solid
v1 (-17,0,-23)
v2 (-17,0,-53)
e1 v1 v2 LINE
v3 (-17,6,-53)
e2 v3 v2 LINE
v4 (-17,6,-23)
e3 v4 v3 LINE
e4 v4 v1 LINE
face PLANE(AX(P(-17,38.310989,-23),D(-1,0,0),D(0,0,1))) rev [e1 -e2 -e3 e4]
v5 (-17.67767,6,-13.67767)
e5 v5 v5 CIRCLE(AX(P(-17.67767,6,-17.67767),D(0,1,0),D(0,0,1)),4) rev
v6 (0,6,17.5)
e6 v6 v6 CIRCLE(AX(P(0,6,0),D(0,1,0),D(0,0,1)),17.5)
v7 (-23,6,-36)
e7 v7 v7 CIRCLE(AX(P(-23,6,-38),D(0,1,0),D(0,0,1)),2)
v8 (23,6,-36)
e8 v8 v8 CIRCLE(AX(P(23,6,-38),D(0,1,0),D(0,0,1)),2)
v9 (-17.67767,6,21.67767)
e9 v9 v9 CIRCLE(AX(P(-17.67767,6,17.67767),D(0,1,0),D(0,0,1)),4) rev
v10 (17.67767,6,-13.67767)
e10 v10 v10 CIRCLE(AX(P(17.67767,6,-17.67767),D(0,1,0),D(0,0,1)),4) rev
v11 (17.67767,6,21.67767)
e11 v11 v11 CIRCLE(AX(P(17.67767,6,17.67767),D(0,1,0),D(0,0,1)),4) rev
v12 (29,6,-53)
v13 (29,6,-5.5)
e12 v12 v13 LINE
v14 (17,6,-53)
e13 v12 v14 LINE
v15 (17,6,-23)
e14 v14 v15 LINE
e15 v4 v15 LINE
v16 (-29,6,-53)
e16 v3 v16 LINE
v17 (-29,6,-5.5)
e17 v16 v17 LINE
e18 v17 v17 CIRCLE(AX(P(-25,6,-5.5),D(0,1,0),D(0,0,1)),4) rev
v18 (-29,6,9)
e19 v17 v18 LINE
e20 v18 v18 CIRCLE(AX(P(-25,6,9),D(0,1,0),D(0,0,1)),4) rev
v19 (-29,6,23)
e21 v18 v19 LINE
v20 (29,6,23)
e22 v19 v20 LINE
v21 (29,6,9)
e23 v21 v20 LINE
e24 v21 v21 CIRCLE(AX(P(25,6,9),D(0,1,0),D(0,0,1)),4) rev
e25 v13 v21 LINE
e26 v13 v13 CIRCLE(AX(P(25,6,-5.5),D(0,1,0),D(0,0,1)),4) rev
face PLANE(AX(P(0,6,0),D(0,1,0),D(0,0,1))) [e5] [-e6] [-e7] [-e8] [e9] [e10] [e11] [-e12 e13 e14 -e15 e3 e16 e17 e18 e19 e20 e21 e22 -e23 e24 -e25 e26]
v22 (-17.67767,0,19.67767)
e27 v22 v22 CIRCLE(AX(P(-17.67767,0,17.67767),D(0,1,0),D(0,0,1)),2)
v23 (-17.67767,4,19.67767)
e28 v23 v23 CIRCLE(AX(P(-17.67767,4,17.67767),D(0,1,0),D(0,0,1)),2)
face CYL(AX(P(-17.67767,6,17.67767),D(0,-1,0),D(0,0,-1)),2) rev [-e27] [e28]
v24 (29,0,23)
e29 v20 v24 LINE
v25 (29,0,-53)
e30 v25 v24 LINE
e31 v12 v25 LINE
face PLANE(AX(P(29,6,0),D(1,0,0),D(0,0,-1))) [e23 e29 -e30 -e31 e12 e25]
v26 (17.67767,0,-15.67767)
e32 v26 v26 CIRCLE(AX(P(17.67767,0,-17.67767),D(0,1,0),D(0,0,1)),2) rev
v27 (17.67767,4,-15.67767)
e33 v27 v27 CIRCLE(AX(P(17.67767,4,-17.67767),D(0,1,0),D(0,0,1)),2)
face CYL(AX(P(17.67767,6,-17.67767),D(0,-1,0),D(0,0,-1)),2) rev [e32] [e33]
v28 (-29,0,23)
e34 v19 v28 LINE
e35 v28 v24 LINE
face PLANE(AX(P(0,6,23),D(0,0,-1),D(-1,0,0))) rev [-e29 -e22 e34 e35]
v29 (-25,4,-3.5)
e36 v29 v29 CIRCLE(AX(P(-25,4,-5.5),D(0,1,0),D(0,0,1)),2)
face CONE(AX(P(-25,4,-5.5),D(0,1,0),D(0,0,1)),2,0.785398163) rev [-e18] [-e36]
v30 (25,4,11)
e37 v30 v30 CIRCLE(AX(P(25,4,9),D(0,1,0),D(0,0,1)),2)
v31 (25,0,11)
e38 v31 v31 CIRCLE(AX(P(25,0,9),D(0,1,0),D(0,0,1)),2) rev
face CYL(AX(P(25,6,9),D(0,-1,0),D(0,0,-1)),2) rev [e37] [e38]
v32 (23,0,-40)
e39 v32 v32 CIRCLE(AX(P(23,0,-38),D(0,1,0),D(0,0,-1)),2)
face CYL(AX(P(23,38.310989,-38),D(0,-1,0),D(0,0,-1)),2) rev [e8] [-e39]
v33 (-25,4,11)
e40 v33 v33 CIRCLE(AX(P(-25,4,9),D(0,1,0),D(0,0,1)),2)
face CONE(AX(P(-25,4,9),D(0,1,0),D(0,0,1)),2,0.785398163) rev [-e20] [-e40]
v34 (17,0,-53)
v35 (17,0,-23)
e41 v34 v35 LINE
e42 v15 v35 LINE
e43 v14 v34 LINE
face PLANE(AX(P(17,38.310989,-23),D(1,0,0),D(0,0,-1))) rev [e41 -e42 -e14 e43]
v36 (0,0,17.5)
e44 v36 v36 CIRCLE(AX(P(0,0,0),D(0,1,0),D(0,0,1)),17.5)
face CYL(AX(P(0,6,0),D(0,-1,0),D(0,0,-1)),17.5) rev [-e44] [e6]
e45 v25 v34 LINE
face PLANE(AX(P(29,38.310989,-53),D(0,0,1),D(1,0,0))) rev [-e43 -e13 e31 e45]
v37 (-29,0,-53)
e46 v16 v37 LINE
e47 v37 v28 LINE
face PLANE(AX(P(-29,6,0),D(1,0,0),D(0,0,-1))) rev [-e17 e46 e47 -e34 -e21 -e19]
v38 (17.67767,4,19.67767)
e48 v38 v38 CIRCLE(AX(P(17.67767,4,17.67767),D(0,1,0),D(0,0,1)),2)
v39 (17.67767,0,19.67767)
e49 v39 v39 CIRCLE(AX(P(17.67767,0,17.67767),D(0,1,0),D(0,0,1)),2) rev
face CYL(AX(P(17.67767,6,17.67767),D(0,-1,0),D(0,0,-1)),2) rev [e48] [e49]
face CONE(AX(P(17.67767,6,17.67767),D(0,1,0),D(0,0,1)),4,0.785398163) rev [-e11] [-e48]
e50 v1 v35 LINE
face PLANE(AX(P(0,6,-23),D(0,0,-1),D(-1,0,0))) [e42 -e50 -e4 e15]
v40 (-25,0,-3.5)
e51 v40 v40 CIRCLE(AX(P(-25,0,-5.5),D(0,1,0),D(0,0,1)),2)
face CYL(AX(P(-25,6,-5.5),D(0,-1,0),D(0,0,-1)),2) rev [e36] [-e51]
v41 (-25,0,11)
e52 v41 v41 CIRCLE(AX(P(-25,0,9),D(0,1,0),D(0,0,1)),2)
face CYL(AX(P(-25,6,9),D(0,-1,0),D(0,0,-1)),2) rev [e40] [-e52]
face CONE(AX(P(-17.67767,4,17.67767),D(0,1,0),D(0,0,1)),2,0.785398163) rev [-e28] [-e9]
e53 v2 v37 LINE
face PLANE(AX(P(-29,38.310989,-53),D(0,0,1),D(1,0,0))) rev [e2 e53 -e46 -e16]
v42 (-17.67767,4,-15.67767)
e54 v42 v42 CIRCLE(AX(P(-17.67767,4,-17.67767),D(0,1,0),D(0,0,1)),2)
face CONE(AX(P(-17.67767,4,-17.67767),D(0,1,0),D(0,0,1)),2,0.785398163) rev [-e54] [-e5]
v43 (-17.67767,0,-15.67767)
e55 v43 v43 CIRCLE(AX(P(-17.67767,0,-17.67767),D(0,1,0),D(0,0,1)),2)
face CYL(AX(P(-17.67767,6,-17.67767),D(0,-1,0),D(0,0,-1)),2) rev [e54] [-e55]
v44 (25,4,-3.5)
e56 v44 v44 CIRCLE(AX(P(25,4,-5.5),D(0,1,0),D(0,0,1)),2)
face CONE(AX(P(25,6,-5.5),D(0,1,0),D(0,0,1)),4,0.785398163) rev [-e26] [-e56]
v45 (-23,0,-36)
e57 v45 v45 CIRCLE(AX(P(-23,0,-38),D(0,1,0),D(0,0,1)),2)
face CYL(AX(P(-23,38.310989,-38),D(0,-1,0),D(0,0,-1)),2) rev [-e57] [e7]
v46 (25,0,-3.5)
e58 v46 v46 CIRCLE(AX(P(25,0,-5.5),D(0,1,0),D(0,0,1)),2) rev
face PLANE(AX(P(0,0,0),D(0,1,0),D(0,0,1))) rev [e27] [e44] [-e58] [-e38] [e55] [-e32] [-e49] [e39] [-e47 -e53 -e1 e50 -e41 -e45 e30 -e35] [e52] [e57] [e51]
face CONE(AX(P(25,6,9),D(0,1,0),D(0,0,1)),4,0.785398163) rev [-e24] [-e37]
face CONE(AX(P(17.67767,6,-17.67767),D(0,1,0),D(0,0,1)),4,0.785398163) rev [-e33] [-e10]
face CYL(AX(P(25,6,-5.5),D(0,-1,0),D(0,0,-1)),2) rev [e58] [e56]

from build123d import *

# Parameters (mm, degrees)
SKETCH_1_W      = 58
SKETCH_1_H      = 46
SKETCH_1_R      = 17.5
SKETCH_1_R_2    = 2
EXTRUDE_1_DEPTH = 6
SKETCH_2_W      = 12
SKETCH_2_H      = 30
SKETCH_2_R      = 2
EXTRUDE_2_DEPTH = 6
CHAMFER_1_SIZE  = 2


with BuildPart() as part:
    # 草图1 → 凸台-拉伸1 (new body)
    with BuildSketch(Plane(origin=(0, 0, 0), x_dir=(1, 0, 0), z_dir=(0, 1, 0))):
        Rectangle(SKETCH_1_W, SKETCH_1_H)
        with Locations(Location((0, 0, 0), (0, 0, 270))):
            Circle(SKETCH_1_R, mode=Mode.SUBTRACT)
        with Locations(Location((-17.67766953, 17.67766953, 0), (0, 0, 270))):
            Circle(SKETCH_1_R_2, mode=Mode.SUBTRACT)
        with Locations(Location((-17.67766953, -17.67766953, 0), (0, 0, 270))):
            Circle(SKETCH_1_R_2, mode=Mode.SUBTRACT)
        with Locations(Location((17.67766953, 17.67766953, 0), (0, 0, 270))):
            Circle(SKETCH_1_R_2, mode=Mode.SUBTRACT)
        with Locations(Location((17.67766953, -17.67766953, 0), (0, 0, 270))):
            Circle(SKETCH_1_R_2, mode=Mode.SUBTRACT)
        with Locations(Location((-25, 5.5, 0), (0, 0, 270))):
            Circle(SKETCH_1_R_2, mode=Mode.SUBTRACT)
        with Locations(Location((-25, -9, 0), (0, 0, 270))):
            Circle(SKETCH_1_R_2, mode=Mode.SUBTRACT)
        with Locations(Location((25, -9, 0), (0, 0, 270))):
            Circle(SKETCH_1_R_2, mode=Mode.SUBTRACT)
        with Locations(Location((25, 5.5, 0), (0, 0, 270))):
            Circle(SKETCH_1_R_2, mode=Mode.SUBTRACT)
    extrude(amount=EXTRUDE_1_DEPTH)

    # 草图2 → 凸台-拉伸2 (add)
    # profile 1 of 2: a face of its own
    with BuildSketch(Plane(origin=(0, 0, 0), x_dir=(1, 0, 0), z_dir=(0, 1, 0))):
        with Locations((-23, 38)):
            Rectangle(SKETCH_2_W, SKETCH_2_H)
        with Locations(Location((-23, 38, 0), (0, 0, 270))):
            Circle(SKETCH_2_R, mode=Mode.SUBTRACT)
    # profile 2 of 2: a face of its own
    with BuildSketch(Plane(origin=(0, 0, 0), x_dir=(1, 0, 0), z_dir=(0, 1, 0))):
        with Locations((23, 38)):
            Rectangle(SKETCH_2_W, SKETCH_2_H)
        with Locations(Location((23, 38, 0), (0, 0, 90))):
            Circle(SKETCH_2_R, mode=Mode.SUBTRACT)
    extrude(amount=EXTRUDE_2_DEPTH)

    # 倒角1
    chamfer_1_edges = [part.edges().sort_by_distance(p)[0] for p in [
        (25, 6, 7),
        (-25, 6, 7),
        (-25, 6, -7.5),
        (17.67766953, 6, -19.67766953),
        (-17.67766953, 6, 15.67766953),
        (-17.67766953, 6, -19.67766953),
        (17.67766953, 6, 15.67766953),
        (25, 6, -7.5),
    ]]
    chamfer(chamfer_1_edges, length=CHAMFER_1_SIZE - 0.0001)  # a hair under: the kernel refuses the full size


solid = part.part
